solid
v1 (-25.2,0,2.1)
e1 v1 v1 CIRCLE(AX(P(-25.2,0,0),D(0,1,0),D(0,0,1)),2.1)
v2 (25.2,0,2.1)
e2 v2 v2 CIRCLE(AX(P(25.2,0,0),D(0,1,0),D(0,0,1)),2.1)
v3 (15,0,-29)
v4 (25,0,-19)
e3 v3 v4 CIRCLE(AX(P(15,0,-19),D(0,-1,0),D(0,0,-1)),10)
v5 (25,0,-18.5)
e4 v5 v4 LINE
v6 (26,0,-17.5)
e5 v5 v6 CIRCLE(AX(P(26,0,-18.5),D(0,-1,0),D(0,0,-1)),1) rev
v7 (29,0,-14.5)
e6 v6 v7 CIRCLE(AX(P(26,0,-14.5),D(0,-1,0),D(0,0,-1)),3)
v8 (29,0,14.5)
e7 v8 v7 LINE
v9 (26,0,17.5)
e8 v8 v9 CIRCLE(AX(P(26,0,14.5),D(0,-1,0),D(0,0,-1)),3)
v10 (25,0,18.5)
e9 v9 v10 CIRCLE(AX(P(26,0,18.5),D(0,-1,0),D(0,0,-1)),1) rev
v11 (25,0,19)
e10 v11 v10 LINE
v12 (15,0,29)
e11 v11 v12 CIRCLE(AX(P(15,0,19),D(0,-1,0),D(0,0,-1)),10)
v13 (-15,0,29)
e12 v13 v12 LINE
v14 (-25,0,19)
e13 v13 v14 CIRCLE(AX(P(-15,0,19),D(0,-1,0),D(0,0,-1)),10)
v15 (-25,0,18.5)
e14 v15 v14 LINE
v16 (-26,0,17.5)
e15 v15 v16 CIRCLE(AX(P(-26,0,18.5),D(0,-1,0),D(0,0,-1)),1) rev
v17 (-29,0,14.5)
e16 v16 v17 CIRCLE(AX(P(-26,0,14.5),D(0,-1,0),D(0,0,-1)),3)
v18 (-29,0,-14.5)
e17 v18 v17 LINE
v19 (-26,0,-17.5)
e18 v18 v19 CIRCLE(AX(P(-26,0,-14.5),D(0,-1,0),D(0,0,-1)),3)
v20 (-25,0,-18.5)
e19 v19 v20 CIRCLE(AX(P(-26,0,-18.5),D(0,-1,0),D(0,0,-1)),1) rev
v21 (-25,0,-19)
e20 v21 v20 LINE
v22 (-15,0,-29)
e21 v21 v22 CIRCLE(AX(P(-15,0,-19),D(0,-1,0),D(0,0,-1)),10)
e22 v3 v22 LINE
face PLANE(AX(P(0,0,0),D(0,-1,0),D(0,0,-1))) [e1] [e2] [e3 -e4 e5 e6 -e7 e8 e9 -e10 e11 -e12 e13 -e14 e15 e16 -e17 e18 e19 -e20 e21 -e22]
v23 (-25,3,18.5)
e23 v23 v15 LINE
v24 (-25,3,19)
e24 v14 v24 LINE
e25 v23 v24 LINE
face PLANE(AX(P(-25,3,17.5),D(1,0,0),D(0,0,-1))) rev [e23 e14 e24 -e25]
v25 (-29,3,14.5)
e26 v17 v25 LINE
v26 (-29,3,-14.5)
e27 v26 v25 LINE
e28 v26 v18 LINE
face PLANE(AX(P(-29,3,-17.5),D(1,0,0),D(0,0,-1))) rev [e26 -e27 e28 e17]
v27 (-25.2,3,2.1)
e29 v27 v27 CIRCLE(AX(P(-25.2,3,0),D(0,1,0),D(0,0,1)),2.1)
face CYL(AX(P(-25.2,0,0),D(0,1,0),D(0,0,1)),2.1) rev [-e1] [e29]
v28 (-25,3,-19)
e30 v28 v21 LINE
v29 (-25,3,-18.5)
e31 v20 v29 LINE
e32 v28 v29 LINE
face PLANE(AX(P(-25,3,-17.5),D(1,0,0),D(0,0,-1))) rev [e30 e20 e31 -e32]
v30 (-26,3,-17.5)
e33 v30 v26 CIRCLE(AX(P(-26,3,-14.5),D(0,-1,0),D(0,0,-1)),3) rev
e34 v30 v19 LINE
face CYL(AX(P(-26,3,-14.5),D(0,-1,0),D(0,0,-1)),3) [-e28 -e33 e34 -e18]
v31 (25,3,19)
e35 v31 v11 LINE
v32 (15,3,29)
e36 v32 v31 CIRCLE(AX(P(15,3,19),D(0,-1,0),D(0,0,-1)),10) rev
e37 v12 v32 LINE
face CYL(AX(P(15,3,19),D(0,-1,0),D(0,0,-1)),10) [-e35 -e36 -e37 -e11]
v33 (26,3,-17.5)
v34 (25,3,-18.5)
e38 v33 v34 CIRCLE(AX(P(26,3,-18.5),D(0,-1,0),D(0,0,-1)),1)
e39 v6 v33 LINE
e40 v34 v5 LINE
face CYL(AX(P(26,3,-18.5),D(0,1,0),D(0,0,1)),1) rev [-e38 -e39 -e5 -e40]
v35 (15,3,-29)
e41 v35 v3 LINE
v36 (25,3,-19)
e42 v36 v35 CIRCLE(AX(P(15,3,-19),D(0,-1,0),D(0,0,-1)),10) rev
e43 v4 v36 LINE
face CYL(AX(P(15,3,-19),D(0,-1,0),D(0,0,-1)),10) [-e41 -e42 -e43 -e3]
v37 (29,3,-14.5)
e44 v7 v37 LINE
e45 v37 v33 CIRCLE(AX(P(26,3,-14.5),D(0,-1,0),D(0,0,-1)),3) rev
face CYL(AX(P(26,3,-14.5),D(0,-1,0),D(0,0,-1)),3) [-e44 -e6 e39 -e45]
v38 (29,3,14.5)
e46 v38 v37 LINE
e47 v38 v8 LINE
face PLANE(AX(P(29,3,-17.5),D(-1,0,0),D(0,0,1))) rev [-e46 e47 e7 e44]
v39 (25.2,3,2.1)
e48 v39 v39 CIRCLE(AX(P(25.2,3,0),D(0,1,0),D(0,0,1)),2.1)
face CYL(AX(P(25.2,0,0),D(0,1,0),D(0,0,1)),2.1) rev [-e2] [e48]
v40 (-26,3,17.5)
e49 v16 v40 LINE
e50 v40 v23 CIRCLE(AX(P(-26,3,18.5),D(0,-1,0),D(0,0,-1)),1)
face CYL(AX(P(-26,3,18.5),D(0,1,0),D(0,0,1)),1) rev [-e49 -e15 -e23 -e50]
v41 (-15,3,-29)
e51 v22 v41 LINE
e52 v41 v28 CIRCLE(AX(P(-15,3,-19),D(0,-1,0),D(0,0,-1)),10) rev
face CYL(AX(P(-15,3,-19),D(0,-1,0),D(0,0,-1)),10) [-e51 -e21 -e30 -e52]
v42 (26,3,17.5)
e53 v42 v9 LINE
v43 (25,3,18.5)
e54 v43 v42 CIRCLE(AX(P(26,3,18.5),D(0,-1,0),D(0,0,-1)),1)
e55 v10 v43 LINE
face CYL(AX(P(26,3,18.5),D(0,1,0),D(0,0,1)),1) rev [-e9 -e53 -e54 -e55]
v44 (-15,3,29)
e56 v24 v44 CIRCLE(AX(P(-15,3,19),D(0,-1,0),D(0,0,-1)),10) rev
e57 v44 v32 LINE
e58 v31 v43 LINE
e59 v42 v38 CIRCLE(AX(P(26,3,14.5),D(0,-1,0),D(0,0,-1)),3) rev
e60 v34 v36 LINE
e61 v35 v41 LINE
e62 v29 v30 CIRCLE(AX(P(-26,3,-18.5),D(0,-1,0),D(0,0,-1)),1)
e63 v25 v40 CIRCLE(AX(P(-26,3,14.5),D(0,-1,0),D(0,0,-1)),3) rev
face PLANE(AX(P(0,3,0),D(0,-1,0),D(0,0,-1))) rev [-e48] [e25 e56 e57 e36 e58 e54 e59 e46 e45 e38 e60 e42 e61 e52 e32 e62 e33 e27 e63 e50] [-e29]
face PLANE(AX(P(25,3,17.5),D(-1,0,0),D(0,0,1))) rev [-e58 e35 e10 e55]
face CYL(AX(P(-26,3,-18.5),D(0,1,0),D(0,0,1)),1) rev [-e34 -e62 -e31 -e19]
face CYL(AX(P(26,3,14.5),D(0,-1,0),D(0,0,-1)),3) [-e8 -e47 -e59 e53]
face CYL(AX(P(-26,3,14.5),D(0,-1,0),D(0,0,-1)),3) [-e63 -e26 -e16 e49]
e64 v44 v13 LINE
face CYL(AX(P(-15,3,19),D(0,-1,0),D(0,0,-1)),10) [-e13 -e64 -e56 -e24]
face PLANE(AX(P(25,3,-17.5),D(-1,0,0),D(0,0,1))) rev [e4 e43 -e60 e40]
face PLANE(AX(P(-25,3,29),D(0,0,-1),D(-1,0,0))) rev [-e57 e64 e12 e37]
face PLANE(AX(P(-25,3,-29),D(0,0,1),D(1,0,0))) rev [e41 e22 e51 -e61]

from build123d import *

# Parameters (mm, degrees)
BOSS_EXTRUDE1_DEPTH = 3
FILLET1_R           = 10
FILLET2_R           = 1
FILLET3_R           = 3
SKETCH2_R           = 2.1
CUT_EXTRUDE1_DEPTH  = 42.12177039


with BuildPart() as part:
    # Sketch1 → Boss-Extrude1 (new body)
    with BuildSketch(Plane(origin=(0, 0, 0), x_dir=(1, 0, 0), z_dir=(0, 1, 0))):
        Polygon((29, -17.5), (25, -17.5), (25, -29), (-25, -29), (-25, -17.5), (-29, -17.5), (-29, 17.5), (-25, 17.5), (-25, 29), (25, 29), (25, 17.5), (29, 17.5), align=None)
    extrude(amount=BOSS_EXTRUDE1_DEPTH)

    # Fillet1
    fillet1_edges = [part.edges().sort_by_distance(p)[0] for p in [
        (25, 1.5, 29),
        (-25, 1.5, 29),
        (-25, 1.5, -29),
        (25, 1.5, -29),
    ]]
    fillet(fillet1_edges, radius=FILLET1_R)

    # Fillet2
    fillet2_edges = [part.edges().sort_by_distance(p)[0] for p in [
        (25, 1.5, 17.5),
        (-25, 1.5, 17.5),
        (-25, 1.5, -17.5),
        (25, 1.5, -17.5),
    ]]
    fillet(fillet2_edges, radius=FILLET2_R)

    # Fillet3
    fillet3_edges = [part.edges().sort_by_distance(p)[0] for p in [
        (29, 1.5, 17.5),
        (29, 1.5, -17.5),
        (-29, 1.5, 17.5),
        (-29, 1.5, -17.5),
    ]]
    fillet(fillet3_edges, radius=FILLET3_R - 0.0001)  # a hair under: the kernel refuses the full size

    # Sketch2 → Cut-Extrude1 (cut, through all)
    with BuildSketch(Plane(origin=(0, 3, 0), x_dir=(1, 0, 0), z_dir=(0, 1, 0))):
        with Locations(Location((-25.2, 0, 0), (0, 0, 270))):
            Circle(SKETCH2_R)
        with Locations(Location((25.2, 0, 0), (0, 0, 270))):
            Circle(SKETCH2_R)
    extrude(amount=-CUT_EXTRUDE1_DEPTH, mode=Mode.SUBTRACT)


solid = part.part
